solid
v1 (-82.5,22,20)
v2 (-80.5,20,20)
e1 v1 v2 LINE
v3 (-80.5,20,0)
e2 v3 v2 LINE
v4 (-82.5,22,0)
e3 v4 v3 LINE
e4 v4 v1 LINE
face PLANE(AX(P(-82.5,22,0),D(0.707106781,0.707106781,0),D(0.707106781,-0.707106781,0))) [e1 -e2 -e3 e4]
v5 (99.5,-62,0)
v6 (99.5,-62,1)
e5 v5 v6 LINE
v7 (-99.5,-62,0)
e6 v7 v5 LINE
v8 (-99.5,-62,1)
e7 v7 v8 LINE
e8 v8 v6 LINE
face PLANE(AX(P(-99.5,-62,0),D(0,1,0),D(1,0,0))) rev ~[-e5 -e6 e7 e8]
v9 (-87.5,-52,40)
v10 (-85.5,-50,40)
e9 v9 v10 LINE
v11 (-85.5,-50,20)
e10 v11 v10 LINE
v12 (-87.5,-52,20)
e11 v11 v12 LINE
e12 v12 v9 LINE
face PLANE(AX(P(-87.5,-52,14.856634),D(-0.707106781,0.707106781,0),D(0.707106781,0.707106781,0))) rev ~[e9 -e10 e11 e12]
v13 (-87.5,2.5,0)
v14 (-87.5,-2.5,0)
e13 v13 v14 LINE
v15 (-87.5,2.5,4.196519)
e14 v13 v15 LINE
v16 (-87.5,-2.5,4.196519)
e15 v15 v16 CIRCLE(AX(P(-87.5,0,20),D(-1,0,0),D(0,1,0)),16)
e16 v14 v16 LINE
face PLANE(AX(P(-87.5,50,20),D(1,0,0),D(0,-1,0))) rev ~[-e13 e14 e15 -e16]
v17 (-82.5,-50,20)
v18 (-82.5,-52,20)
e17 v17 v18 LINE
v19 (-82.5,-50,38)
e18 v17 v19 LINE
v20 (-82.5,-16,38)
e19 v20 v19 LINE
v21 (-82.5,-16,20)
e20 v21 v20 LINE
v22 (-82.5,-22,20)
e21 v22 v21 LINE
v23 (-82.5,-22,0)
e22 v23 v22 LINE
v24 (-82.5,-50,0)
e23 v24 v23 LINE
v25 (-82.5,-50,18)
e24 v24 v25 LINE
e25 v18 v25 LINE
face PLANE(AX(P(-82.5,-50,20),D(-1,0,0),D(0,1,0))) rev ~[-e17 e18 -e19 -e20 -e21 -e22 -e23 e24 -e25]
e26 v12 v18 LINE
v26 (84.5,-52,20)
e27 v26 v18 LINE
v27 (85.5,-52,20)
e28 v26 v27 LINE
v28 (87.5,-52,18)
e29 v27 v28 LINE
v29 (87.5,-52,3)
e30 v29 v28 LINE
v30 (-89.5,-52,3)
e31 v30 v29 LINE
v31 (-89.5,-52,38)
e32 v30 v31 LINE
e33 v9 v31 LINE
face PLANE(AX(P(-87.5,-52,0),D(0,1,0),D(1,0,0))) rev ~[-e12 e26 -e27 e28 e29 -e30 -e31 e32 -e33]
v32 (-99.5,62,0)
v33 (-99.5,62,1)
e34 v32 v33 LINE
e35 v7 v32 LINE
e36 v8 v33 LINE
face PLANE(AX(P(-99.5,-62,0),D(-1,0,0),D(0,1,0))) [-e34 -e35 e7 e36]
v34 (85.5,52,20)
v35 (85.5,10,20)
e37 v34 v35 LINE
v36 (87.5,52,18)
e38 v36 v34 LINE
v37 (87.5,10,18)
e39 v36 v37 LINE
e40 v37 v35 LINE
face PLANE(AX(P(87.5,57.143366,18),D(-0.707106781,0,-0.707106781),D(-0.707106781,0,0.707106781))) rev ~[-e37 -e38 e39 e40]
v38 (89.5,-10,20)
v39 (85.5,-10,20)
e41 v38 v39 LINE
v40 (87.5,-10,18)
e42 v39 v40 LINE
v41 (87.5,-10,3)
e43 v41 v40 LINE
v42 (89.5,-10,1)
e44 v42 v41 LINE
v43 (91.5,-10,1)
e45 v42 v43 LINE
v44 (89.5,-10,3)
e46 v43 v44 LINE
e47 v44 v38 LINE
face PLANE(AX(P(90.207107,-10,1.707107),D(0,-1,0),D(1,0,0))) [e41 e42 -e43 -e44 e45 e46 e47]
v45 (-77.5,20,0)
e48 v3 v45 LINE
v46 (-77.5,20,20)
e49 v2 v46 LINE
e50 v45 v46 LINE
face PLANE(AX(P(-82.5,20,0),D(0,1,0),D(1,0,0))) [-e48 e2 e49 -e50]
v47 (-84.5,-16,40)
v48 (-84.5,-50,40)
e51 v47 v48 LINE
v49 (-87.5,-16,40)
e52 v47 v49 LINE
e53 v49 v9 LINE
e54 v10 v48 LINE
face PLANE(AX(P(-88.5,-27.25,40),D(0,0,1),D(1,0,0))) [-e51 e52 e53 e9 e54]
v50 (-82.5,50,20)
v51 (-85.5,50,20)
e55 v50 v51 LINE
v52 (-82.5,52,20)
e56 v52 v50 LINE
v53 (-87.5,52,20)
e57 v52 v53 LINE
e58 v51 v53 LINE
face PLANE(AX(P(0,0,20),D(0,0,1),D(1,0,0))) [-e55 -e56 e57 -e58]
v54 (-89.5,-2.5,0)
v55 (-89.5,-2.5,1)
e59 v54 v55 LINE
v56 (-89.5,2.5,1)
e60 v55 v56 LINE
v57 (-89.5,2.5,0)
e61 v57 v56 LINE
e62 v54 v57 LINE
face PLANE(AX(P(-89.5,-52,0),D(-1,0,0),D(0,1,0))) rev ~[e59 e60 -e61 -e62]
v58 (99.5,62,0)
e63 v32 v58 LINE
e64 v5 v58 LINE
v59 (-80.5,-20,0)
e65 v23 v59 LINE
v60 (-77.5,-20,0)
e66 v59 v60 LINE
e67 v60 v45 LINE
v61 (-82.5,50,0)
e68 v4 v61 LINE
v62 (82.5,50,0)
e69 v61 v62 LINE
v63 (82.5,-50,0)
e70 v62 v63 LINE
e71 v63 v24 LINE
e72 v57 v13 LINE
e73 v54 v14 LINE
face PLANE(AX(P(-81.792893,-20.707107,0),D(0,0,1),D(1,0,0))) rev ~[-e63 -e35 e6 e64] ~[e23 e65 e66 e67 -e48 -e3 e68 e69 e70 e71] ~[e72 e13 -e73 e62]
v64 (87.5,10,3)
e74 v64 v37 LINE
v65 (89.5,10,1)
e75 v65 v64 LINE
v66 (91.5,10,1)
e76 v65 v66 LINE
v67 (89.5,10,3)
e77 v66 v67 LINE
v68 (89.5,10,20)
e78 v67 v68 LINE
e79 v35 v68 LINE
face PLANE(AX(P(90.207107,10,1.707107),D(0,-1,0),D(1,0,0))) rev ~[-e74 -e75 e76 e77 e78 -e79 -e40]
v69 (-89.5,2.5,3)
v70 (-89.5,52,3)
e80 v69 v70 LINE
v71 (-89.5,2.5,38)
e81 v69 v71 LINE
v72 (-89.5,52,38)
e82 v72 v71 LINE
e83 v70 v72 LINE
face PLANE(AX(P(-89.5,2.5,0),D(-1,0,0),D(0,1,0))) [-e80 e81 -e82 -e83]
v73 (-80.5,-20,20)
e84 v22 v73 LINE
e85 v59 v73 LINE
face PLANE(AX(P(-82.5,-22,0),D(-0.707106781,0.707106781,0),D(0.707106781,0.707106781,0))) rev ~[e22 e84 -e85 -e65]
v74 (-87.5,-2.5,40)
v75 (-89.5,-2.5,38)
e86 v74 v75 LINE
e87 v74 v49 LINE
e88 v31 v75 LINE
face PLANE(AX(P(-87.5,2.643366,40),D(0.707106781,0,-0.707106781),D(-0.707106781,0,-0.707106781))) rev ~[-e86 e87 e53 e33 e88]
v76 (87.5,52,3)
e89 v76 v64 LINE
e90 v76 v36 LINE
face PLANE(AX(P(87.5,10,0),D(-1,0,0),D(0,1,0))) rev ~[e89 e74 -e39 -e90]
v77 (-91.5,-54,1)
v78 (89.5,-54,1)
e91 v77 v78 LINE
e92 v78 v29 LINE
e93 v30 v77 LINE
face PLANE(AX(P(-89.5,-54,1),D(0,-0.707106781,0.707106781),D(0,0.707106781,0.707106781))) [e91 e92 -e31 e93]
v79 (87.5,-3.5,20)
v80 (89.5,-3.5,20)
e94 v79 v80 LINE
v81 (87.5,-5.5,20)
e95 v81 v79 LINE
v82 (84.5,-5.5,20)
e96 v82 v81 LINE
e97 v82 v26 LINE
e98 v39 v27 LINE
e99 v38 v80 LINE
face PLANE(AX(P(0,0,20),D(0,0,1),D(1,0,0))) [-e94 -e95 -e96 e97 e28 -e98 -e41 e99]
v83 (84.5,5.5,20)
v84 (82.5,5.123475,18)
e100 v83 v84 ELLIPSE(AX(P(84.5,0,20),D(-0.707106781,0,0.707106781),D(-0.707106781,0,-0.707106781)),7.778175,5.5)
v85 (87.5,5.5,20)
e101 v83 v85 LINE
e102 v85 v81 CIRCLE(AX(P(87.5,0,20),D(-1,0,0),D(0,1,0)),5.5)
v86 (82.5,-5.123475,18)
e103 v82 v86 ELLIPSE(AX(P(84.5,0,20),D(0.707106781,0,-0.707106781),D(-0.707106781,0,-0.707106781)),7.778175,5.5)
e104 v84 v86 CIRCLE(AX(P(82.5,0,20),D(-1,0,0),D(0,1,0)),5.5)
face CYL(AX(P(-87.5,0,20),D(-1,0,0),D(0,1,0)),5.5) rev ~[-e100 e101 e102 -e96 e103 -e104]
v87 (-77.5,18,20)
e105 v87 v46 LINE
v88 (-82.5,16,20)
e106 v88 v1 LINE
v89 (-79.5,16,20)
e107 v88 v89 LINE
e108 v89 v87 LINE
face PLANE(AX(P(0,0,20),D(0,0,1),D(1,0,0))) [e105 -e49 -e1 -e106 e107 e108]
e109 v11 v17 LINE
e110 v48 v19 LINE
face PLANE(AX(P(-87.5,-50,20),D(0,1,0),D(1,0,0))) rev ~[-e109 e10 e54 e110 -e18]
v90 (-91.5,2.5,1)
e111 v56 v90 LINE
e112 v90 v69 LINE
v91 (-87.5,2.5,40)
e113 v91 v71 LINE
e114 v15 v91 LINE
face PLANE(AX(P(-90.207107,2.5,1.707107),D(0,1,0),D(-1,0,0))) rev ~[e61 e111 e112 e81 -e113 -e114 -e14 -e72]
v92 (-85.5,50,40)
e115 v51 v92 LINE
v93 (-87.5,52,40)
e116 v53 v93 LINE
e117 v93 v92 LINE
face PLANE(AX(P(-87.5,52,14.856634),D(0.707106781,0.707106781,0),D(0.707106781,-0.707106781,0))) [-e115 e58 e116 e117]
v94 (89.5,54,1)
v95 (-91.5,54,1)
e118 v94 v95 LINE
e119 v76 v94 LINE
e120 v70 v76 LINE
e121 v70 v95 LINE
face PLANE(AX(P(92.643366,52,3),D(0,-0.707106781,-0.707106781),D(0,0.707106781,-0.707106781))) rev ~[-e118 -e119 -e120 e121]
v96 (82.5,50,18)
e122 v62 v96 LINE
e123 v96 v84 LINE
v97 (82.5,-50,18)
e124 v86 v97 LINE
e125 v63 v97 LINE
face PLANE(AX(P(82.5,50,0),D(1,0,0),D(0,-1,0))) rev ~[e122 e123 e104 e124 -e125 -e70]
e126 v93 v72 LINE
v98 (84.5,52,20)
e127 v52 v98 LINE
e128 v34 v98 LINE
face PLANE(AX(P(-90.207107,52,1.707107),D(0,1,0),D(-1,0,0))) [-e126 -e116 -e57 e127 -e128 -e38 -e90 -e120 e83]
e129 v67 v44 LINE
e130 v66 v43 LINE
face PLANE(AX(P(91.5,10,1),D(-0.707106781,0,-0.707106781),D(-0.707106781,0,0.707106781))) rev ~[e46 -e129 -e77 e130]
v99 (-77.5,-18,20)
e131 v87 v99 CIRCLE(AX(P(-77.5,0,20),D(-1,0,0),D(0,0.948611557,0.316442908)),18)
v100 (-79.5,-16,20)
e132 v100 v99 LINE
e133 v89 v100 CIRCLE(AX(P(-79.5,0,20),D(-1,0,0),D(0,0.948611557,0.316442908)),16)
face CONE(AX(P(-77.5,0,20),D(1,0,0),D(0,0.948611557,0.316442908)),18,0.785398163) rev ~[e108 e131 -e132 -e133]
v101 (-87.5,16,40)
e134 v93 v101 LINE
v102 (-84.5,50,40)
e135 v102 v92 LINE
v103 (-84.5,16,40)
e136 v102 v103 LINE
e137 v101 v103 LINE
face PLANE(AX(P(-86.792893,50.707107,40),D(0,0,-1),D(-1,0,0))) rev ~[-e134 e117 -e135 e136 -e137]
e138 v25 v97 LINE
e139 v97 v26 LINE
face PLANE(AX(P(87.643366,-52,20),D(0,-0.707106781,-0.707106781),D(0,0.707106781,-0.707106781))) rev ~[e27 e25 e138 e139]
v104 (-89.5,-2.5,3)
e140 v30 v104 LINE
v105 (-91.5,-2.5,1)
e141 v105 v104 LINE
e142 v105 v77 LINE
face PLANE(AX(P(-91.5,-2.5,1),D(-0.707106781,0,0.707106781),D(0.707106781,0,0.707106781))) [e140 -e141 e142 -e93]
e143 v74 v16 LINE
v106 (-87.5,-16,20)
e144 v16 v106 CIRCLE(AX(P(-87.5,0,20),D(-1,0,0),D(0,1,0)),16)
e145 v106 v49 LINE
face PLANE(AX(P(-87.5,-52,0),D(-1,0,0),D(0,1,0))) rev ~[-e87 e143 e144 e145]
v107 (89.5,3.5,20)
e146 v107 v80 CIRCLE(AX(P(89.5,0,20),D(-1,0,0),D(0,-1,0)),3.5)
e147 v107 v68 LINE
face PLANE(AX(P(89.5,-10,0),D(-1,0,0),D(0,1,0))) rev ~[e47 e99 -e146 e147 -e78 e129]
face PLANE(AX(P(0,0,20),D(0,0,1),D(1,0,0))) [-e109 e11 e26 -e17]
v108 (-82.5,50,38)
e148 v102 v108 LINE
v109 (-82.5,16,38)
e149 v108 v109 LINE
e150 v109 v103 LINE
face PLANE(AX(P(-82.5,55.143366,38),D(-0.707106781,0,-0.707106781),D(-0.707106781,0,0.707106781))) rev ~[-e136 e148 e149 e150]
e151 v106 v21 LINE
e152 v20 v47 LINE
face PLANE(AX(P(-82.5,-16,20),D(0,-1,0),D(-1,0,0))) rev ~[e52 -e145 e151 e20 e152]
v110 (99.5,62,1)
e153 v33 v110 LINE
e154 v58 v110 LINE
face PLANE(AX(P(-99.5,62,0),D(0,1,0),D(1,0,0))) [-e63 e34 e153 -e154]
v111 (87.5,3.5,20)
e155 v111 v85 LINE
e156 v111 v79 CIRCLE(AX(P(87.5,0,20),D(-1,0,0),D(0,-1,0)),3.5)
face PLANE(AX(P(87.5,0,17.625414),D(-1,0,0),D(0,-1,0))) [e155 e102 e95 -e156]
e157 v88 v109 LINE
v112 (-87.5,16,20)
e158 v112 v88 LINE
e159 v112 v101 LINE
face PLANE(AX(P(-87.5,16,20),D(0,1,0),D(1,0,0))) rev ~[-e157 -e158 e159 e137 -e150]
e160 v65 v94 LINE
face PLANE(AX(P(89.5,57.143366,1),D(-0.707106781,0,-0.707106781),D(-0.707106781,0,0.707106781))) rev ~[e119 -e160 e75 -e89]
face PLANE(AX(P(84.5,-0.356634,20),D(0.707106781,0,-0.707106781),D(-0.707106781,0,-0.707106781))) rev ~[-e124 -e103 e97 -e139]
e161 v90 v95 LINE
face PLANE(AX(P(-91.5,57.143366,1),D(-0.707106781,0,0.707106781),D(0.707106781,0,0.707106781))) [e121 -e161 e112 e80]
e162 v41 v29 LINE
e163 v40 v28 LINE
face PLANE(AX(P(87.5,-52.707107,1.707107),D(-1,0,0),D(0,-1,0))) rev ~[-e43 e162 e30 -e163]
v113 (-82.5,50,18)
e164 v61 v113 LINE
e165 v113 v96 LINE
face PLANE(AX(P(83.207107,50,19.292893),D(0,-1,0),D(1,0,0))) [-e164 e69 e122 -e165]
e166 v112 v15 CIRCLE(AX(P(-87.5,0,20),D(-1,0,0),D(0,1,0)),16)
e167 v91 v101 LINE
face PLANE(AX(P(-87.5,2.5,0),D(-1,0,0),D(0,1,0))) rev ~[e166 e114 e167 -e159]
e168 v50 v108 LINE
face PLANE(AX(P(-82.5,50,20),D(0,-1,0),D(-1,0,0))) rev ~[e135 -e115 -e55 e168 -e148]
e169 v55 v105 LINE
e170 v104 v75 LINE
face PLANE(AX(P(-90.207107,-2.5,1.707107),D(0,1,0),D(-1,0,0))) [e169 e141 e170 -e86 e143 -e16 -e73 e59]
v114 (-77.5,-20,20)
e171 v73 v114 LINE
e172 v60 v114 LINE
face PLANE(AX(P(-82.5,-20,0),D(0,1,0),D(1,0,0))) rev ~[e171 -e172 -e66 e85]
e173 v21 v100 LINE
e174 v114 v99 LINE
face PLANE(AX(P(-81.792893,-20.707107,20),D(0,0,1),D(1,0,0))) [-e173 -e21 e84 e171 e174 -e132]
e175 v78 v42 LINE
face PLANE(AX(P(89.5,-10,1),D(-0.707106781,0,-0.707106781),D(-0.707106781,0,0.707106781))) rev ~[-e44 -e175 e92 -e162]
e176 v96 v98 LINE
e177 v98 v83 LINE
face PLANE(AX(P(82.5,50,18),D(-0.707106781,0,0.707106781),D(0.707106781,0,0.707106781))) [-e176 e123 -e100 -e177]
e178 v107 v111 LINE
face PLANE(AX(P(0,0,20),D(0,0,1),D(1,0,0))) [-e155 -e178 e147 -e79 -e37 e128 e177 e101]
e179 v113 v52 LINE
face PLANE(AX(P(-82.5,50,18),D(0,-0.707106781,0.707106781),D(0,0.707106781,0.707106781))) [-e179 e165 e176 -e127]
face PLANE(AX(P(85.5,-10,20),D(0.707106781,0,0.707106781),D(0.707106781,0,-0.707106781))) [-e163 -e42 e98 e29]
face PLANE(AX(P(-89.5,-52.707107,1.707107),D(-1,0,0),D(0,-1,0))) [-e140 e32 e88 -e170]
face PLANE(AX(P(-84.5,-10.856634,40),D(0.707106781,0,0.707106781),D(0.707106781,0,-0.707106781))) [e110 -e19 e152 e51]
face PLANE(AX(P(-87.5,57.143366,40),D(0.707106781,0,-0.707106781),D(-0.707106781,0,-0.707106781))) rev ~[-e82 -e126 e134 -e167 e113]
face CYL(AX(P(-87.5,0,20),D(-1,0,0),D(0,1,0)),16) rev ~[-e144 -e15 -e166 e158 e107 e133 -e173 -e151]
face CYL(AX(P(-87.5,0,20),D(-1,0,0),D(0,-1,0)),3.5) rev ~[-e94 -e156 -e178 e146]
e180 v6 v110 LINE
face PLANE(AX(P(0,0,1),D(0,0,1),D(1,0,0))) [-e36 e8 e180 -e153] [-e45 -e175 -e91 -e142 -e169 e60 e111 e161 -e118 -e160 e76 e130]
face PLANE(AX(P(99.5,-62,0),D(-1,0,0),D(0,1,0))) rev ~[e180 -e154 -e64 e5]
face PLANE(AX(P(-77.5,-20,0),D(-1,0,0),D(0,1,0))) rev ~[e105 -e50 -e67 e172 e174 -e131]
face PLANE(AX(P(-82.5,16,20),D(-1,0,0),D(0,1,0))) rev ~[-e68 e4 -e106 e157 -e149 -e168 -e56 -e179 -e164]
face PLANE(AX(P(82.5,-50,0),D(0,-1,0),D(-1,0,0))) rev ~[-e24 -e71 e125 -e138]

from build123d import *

# Parameters (mm, degrees)
F0_W           = 5
F0_H           = 40
F0_W_2         = 2
F0_H_2         = 20
F1_DEPTH       = 20
F3_DEPTH       = 10
F4_DEPTH       = 175
F6_DEPTH       = 20
F0_H_3         = 49.5
F7_DEPTH       = 40
F8_DEPTH       = 177
F0_W_3         = 199
F0_H_4         = 124
F9_DEPTH       = 1
F10_T1_DEPTH   = 49.5
F10_T3_DEPTH   = 177
F10_T5_DEPTH   = 47.1433659759
F10_T7_DEPTH   = 47.1433659759
F10_T9_DEPTH   = 20
F10_T11_DEPTH  = 20
F10_T13_DEPTH  = 49.5
F10_T15_DEPTH  = 25.1433659759
F10_T20_DEPTH  = 59.7867319519
F10_T25_DEPTH  = 59.7867319519
F10_T31_DEPTH  = 182.1433659759
F10_T35_DEPTH  = 54.6433659759
F10_T42_DEPTH  = 182.1433659759
F10_T46_DEPTH  = 54.6433659759
F10_T53_DEPTH  = 47.1433659759
F10_T57_DEPTH  = 182.1433659759
F10_T64_DEPTH  = 182.1433659759
F10_T68_DEPTH  = 47.1433659759
F10_T71_DEPTH  = 47.1433659759
F10_T73_DEPTH  = 47.1433659759
F10_T75_DEPTH  = 49.6433659759
F10_T77_DEPTH  = 49.6433659759
F10_T79_DEPTH  = 165
F10_T81_DEPTH  = 44.2867319519
F10_T83_DEPTH  = 44.2867319519
F10_T85_DEPTH  = 59.7867319519
F10_T87_DEPTH  = 59.7867319519
F10_T90_ANGLE  = 216.895885655
F10_T95_DEPTH  = 54.7867319519
F10_T100_DEPTH = 170.1433659759
F10_T108_DEPTH = 170.1433659759
F10_T113_DEPTH = 54.7867319519


# Not quite as in the source:
# - a fillet or chamfer that OpenCascade refuses, or shapes differently, is made with other operations: its cross-section is extruded or revolved along the edge and cut away or added


with BuildPart() as f1:
    # F0 (on Top) → F1 (new body)
    with BuildSketch(Plane.XY):
        Polygon((87.5, 52), (-87.5, 52), (-87.5, 2.5), (-87.5, -2.5), (-87.5, -52), (87.5, -52), (87.5, -10), (87.5, 10), align=None)
        Polygon((-82.5, 20), (-82.5, 50), (82.5, 50), (82.5, -50), (-82.5, -50), (-82.5, -20), align=None, mode=Mode.SUBTRACT)
        with Locations((-80, 0)):
            Rectangle(F0_W, F0_H)
        with Locations((88.5, 0)):
            Rectangle(F0_W_2, F0_H_2)
    extrude(amount=F1_DEPTH)

    # F2 (on face) → F3 (cut, through all)
    with BuildSketch(Plane(origin=(-87.5, 0, 0), x_dir=(0, -1, 0), z_dir=(-1, 0, 0))):
        with BuildLine():
            ThreePointArc((-16, 20), (0, 4), (16, 20))
            Line((16, 20), (5.5, 20))
            ThreePointArc((5.5, 20), (0, 14.5), (-5.5, 20))
            Line((-5.5, 20), (-16, 20))
        make_face()
        with BuildLine():
            ThreePointArc((-5.5, 20), (0, 14.5), (5.5, 20))
            Line((5.5, 20), (3.5, 20))
            ThreePointArc((3.5, 20), (0, 16.5), (-3.5, 20))
            Line((-3.5, 20), (-5.5, 20))
        make_face()
    extrude(amount=-F3_DEPTH, mode=Mode.SUBTRACT)

    # F2 (on face) → F4 (cut, through all)
    with BuildSketch(Plane(origin=(-87.5, 0, 0), x_dir=(0, -1, 0), z_dir=(-1, 0, 0))):
        with BuildLine():
            ThreePointArc((-5.5, 20), (0, 14.5), (5.5, 20))
            Line((5.5, 20), (3.5, 20))
            ThreePointArc((3.5, 20), (0, 16.5), (-3.5, 20))
            Line((-3.5, 20), (-5.5, 20))
        make_face()
        with BuildLine():
            ThreePointArc((-3.5, 20), (0, 16.5), (3.5, 20))
            Line((3.5, 20), (-3.5, 20))
        make_face()
    extrude(amount=-F4_DEPTH, mode=Mode.SUBTRACT)

    # F5 (on face) → F6 (join)
    with BuildSketch(Plane.XY.offset(20)):
        Polygon((-82.5, 20), (-82.5, 50), (-87.5, 50), (-87.5, 16), (-82.5, 16), align=None)
        Polygon((-82.5, -16), (-87.5, -16), (-87.5, -50), (-82.5, -50), (-82.5, -20), align=None)
    extrude(amount=F6_DEPTH)

    # F0 (on Top) → F7 (join, through all)
    with BuildSketch(Plane.XY):
        with Locations((-88.5, 27.25)):
            Rectangle(F0_W_2, F0_H_3)
        with Locations((-88.5, -27.25)):
            Rectangle(F0_W_2, F0_H_3)
    extrude(amount=F7_DEPTH)

    # F2 (on face) → F8 (cut, through all)
    with BuildSketch(Plane(origin=(-87.5, 0, 0), x_dir=(0, -1, 0), z_dir=(-1, 0, 0))):
        with BuildLine():
            ThreePointArc((-3.5, 20), (0, 16.5), (3.5, 20))
            Line((3.5, 20), (-3.5, 20))
        make_face()
        with BuildLine():
            Line((-3.5, 20), (3.5, 20))
            ThreePointArc((3.5, 20), (0, 23.5), (-3.5, 20))
        make_face()
    extrude(amount=-F8_DEPTH, mode=Mode.SUBTRACT)

    # F0 (on Top) → F9 (join)
    with BuildSketch(Plane.XY):
        Rectangle(F0_W_3, F0_H_4)
        Polygon((-89.5, 52), (-87.5, 52), (87.5, 52), (87.5, 10), (89.5, 10), (89.5, -10), (87.5, -10), (87.5, -52), (-87.5, -52), (-89.5, -52), (-89.5, -2.5), (-89.5, 2.5), align=None, mode=Mode.SUBTRACT)
    extrude(amount=F9_DEPTH)

    # F10: chamfer of 2 on 23 edges, made by hand

    # F10_s2 → F10_t1 (join)
    with BuildSketch(Plane.XZ.offset(-52)):
        Polygon((-91.5, 1), (-89.5, 3), (-89.5, 1), align=None)
    extrude(amount=F10_T1_DEPTH)

    # F10_s4 → F10_t3 (join)
    with BuildSketch(Plane.YZ.offset(-89.5)):
        Polygon((-54, 1), (-52, 3), (-52, 1), align=None)
        Polygon((52, 3), (54, 1), (52, 1), align=None)
    extrude(amount=F10_T3_DEPTH)

    # F10_s6 → F10_t5 (join)
    with BuildSketch(Plane.XZ.offset(-52)):
        Polygon((89.5, 1), (87.5, 3), (87.5, 1), align=None)
    extrude(amount=F10_T5_DEPTH)

    # F10_s8 → F10_t7 (join)
    with BuildSketch(Plane.XZ.offset(4.8566340241)):
        Polygon((89.5, 1), (87.5, 3), (87.5, 1), align=None)
    extrude(amount=F10_T7_DEPTH)

    # F10_s10 → F10_t9 (join)
    with BuildSketch(Plane.XZ.offset(-10)):
        Polygon((91.5, 1), (89.5, 3), (89.5, 1), align=None)
    extrude(amount=F10_T9_DEPTH)

    # F10_s12 → F10_t11 (join)
    with BuildSketch(Plane.XY):
        Polygon((-82.5, -22), (-80.5, -20), (-82.5, -20), align=None)
        Polygon((-82.5, 22), (-80.5, 20), (-82.5, 20), align=None)
    extrude(amount=F10_T11_DEPTH)

    # F10_s14 → F10_t13 (join)
    with BuildSketch(Plane.XZ.offset(2.5)):
        Polygon((-91.5, 1), (-89.5, 3), (-89.5, 1), align=None)
    extrude(amount=F10_T13_DEPTH)

    # F10_s16 → F10_t15 (join)
    with BuildSketch(Plane.XY.offset(14.8566340241)):
        Polygon((-87.5, 52), (-85.5, 50), (-87.5, 50), align=None)
        Polygon((-87.5, -52), (-85.5, -50), (-87.5, -50), align=None)
    extrude(amount=F10_T15_DEPTH)


with BuildPart() as f10_tool18:
    # F10_s19 → F10_t20 (new body)
    with BuildSketch(Plane.XZ.offset(-57.1433659759)):
        Polygon((-91.5, 1), (-89.5, 3), (-89.5, 1), align=None)
    extrude(amount=F10_T20_DEPTH)

    split(bisect_by=Plane.XZ.offset(2.5), keep=Keep.TOP)


with BuildPart() as f1_1:
    add(f1.part)

    # F10_t17: union F10_tool18
    add(f10_tool18.part)


with BuildPart() as f10_tool23:
    # F10_s24 → F10_t25 (new body)
    with BuildSketch(Plane.XZ.offset(-2.6433659759)):
        Polygon((-91.5, 1), (-89.5, 3), (-89.5, 1), align=None)
    extrude(amount=F10_T25_DEPTH)

    split(bisect_by=Plane.XZ.offset(-2.5), keep=Keep.BOTTOM)


with BuildPart() as f1_2:
    add(f1_1.part)

    # F10_t22: union F10_tool23
    add(f10_tool23.part)


with BuildPart() as f10_tool29:
    # F10_s30 → F10_t31 (new body)
    with BuildSketch(Plane.YZ.offset(87.5)):
        Polygon((52, 3), (54, 1), (52, 1), align=None)
    extrude(amount=-F10_T31_DEPTH)

    split(bisect_by=Plane.YZ.offset(-89.5), keep=Keep.BOTTOM)


with BuildPart() as f10_tool33:
    # F10_s34 → F10_t35 (new body)
    with BuildSketch(Plane.XZ.offset(-57.1433659759)):
        Polygon((-91.5, 1), (-89.5, 3), (-89.5, 1), align=None)
    extrude(amount=F10_T35_DEPTH)

    split(bisect_by=Plane.XZ.offset(-52), keep=Keep.BOTTOM)


with BuildPart() as f10_tool29_1:
    add(f10_tool29.part)

    # F10_t37: intersect F10_tool33
    add(f10_tool33.part, mode=Mode.INTERSECT)


with BuildPart() as f1_3:
    add(f1_2.part)

    # F10_t27: union F10_tool29
    add(f10_tool29_1.part)


with BuildPart() as f10_tool40:
    # F10_s41 → F10_t42 (new body)
    with BuildSketch(Plane.YZ.offset(-94.6433659759)):
        Polygon((-54, 1), (-52, 3), (-52, 1), align=None)
    extrude(amount=F10_T42_DEPTH)

    split(bisect_by=Plane.YZ.offset(-89.5), keep=Keep.BOTTOM)


with BuildPart() as f10_tool44:
    # F10_s45 → F10_t46 (new body)
    with BuildSketch(Plane.XZ.offset(2.5)):
        Polygon((-91.5, 1), (-89.5, 3), (-89.5, 1), align=None)
    extrude(amount=F10_T46_DEPTH)

    split(bisect_by=Plane.XZ.offset(52), keep=Keep.TOP)


with BuildPart() as f10_tool40_1:
    add(f10_tool40.part)

    # F10_t48: intersect F10_tool44
    add(f10_tool44.part, mode=Mode.INTERSECT)


with BuildPart() as f1_4:
    add(f1_3.part)

    # F10_t38: union F10_tool40
    add(f10_tool40_1.part)


with BuildPart() as f10_tool51:
    # F10_s52 → F10_t53 (new body)
    with BuildSketch(Plane.XZ.offset(10)):
        Polygon((89.5, 1), (87.5, 3), (87.5, 1), align=None)
    extrude(amount=F10_T53_DEPTH)

    split(bisect_by=Plane.XZ.offset(52), keep=Keep.TOP)


with BuildPart() as f10_tool55:
    # F10_s56 → F10_t57 (new body)
    with BuildSketch(Plane.YZ.offset(-89.5)):
        Polygon((-54, 1), (-52, 3), (-52, 1), align=None)
    extrude(amount=F10_T57_DEPTH)

    split(bisect_by=Plane.YZ.offset(87.5), keep=Keep.TOP)


with BuildPart() as f10_tool51_1:
    add(f10_tool51.part)

    # F10_t59: intersect F10_tool55
    add(f10_tool55.part, mode=Mode.INTERSECT)


with BuildPart() as f1_5:
    add(f1_4.part)

    # F10_t49: union F10_tool51
    add(f10_tool51_1.part)


with BuildPart() as f10_tool62:
    # F10_s63 → F10_t64 (new body)
    with BuildSketch(Plane.YZ.offset(92.6433659759)):
        Polygon((52, 3), (54, 1), (52, 1), align=None)
    extrude(amount=-F10_T64_DEPTH)

    split(bisect_by=Plane.YZ.offset(87.5), keep=Keep.TOP)


with BuildPart() as f10_tool66:
    # F10_s67 → F10_t68 (new body)
    with BuildSketch(Plane.XZ.offset(-57.1433659759)):
        Polygon((89.5, 1), (87.5, 3), (87.5, 1), align=None)
    extrude(amount=F10_T68_DEPTH)

    split(bisect_by=Plane.XZ.offset(-52), keep=Keep.BOTTOM)


with BuildPart() as f10_tool62_1:
    add(f10_tool62.part)

    # F10_t70: intersect F10_tool66
    add(f10_tool66.part, mode=Mode.INTERSECT)


with BuildPart() as f1_6:
    add(f1_5.part)

    # F10_t60: union F10_tool62
    add(f10_tool62_1.part)

    # F10_s72 → F10_t71 (cut)
    with BuildSketch(Plane.XZ.offset(10)):
        Polygon((85.5, 20), (87.5, 18), (87.5, 20), align=None)
    extrude(amount=F10_T71_DEPTH, mode=Mode.SUBTRACT)

    # F10_s74 → F10_t73 (cut)
    with BuildSketch(Plane.XZ.offset(-57.1433659759)):
        Polygon((87.5, 18), (85.5, 20), (87.5, 20), align=None)
    extrude(amount=F10_T73_DEPTH, mode=Mode.SUBTRACT)

    # F10_s76 → F10_t75 (cut)
    with BuildSketch(Plane.XZ.offset(-50)):
        Polygon((82.5, 18), (84.5, 20), (82.5, 20), align=None)
    extrude(amount=F10_T75_DEPTH, mode=Mode.SUBTRACT)

    # F10_s78 → F10_t77 (cut)
    with BuildSketch(Plane.XZ.offset(0.3566340241)):
        Polygon((84.5, 20), (82.5, 18), (82.5, 20), align=None)
    extrude(amount=F10_T77_DEPTH, mode=Mode.SUBTRACT)

    # F10_s80 → F10_t79 (cut)
    with BuildSketch(Plane.YZ.offset(-82.5)):
        Polygon((50, 18), (52, 20), (50, 20), align=None)
        Polygon((-52, 20), (-50, 18), (-50, 20), align=None)
    extrude(amount=F10_T79_DEPTH, mode=Mode.SUBTRACT)

    # F10_s82 → F10_t81 (cut)
    with BuildSketch(Plane.XZ.offset(10.8566340241)):
        Polygon((-84.5, 40), (-82.5, 38), (-82.5, 40), align=None)
    extrude(amount=F10_T81_DEPTH, mode=Mode.SUBTRACT)

    # F10_s84 → F10_t83 (cut)
    with BuildSketch(Plane.XZ.offset(-55.1433659759)):
        Polygon((-82.5, 38), (-84.5, 40), (-82.5, 40), align=None)
    extrude(amount=F10_T83_DEPTH, mode=Mode.SUBTRACT)

    # F10_s86 → F10_t85 (cut)
    with BuildSketch(Plane.XZ.offset(-2.6433659759)):
        Polygon((-87.5, 40), (-89.5, 38), (-89.5, 40), align=None)
    extrude(amount=F10_T85_DEPTH, mode=Mode.SUBTRACT)

    # F10_s88 → F10_t87 (cut)
    with BuildSketch(Plane.XZ.offset(-57.1433659759)):
        Polygon((-87.5, 40), (-89.5, 38), (-89.5, 40), align=None)
    extrude(amount=F10_T87_DEPTH, mode=Mode.SUBTRACT)

    # F10_s89 → F10_t90 (revolve, cut)
    with BuildSketch(Plane(origin=(0, -6.0036279933, 17.9972777192), x_dir=(1, 0, 0), z_dir=(0, -0.316442908, 0.9486115569))):
        Polygon((-77.5, 24.3288581605), (-79.5, 22.3288581605), (-77.5, 22.3288581605), align=None)
    revolve(axis=Axis((-77.5, 0, 20), (-1, 0, 0)), revolution_arc=F10_T90_ANGLE, mode=Mode.SUBTRACT)


with BuildPart() as f10_tool93:
    # F10_s94 → F10_t95 (new body)
    with BuildSketch(Plane.XZ.offset(-55.1433659759)):
        Polygon((82.5, 18), (84.5, 20), (82.5, 20), align=None)
    extrude(amount=F10_T95_DEPTH)

    split(bisect_by=Plane.XZ.offset(-52), keep=Keep.TOP)

    split(bisect_by=Plane.XZ.offset(-50), keep=Keep.BOTTOM)


with BuildPart() as f10_tool98:
    # F10_s99 → F10_t100 (new body)
    with BuildSketch(Plane.YZ.offset(-82.5)):
        Polygon((50, 18), (52, 20), (50, 20), align=None)
    extrude(amount=F10_T100_DEPTH)

    split(bisect_by=Plane.YZ.offset(87.5), keep=Keep.BOTTOM)

    split(bisect_by=Plane.YZ.offset(82.5), keep=Keep.TOP)


with BuildPart() as f10_tool93_1:
    add(f10_tool93.part)

    # F10_t103: intersect F10_tool98
    add(f10_tool98.part, mode=Mode.INTERSECT)


with BuildPart() as f1_7:
    add(f1_6.part)

    # F10_t91: cut F10_tool93
    add(f10_tool93_1.part, mode=Mode.SUBTRACT)


with BuildPart() as f10_tool106:
    # F10_s107 → F10_t108 (new body)
    with BuildSketch(Plane.YZ.offset(87.6433659759)):
        Polygon((-52, 20), (-50, 18), (-50, 20), align=None)
    extrude(amount=-F10_T108_DEPTH)

    split(bisect_by=Plane.YZ.offset(87.5), keep=Keep.BOTTOM)

    split(bisect_by=Plane.YZ.offset(82.5), keep=Keep.TOP)


with BuildPart() as f10_tool111:
    # F10_s112 → F10_t113 (new body)
    with BuildSketch(Plane.XZ.offset(0.3566340241)):
        Polygon((84.5, 20), (82.5, 18), (82.5, 20), align=None)
    extrude(amount=F10_T113_DEPTH)

    split(bisect_by=Plane.XZ.offset(52), keep=Keep.BOTTOM)

    split(bisect_by=Plane.XZ.offset(50), keep=Keep.TOP)


with BuildPart() as f10_tool106_1:
    add(f10_tool106.part)

    # F10_t116: intersect F10_tool111
    add(f10_tool111.part, mode=Mode.INTERSECT)


with BuildPart() as f1_8:
    add(f1_7.part)

    # F10_t104: cut F10_tool106
    add(f10_tool106_1.part, mode=Mode.SUBTRACT)


solid = f1_8.part
